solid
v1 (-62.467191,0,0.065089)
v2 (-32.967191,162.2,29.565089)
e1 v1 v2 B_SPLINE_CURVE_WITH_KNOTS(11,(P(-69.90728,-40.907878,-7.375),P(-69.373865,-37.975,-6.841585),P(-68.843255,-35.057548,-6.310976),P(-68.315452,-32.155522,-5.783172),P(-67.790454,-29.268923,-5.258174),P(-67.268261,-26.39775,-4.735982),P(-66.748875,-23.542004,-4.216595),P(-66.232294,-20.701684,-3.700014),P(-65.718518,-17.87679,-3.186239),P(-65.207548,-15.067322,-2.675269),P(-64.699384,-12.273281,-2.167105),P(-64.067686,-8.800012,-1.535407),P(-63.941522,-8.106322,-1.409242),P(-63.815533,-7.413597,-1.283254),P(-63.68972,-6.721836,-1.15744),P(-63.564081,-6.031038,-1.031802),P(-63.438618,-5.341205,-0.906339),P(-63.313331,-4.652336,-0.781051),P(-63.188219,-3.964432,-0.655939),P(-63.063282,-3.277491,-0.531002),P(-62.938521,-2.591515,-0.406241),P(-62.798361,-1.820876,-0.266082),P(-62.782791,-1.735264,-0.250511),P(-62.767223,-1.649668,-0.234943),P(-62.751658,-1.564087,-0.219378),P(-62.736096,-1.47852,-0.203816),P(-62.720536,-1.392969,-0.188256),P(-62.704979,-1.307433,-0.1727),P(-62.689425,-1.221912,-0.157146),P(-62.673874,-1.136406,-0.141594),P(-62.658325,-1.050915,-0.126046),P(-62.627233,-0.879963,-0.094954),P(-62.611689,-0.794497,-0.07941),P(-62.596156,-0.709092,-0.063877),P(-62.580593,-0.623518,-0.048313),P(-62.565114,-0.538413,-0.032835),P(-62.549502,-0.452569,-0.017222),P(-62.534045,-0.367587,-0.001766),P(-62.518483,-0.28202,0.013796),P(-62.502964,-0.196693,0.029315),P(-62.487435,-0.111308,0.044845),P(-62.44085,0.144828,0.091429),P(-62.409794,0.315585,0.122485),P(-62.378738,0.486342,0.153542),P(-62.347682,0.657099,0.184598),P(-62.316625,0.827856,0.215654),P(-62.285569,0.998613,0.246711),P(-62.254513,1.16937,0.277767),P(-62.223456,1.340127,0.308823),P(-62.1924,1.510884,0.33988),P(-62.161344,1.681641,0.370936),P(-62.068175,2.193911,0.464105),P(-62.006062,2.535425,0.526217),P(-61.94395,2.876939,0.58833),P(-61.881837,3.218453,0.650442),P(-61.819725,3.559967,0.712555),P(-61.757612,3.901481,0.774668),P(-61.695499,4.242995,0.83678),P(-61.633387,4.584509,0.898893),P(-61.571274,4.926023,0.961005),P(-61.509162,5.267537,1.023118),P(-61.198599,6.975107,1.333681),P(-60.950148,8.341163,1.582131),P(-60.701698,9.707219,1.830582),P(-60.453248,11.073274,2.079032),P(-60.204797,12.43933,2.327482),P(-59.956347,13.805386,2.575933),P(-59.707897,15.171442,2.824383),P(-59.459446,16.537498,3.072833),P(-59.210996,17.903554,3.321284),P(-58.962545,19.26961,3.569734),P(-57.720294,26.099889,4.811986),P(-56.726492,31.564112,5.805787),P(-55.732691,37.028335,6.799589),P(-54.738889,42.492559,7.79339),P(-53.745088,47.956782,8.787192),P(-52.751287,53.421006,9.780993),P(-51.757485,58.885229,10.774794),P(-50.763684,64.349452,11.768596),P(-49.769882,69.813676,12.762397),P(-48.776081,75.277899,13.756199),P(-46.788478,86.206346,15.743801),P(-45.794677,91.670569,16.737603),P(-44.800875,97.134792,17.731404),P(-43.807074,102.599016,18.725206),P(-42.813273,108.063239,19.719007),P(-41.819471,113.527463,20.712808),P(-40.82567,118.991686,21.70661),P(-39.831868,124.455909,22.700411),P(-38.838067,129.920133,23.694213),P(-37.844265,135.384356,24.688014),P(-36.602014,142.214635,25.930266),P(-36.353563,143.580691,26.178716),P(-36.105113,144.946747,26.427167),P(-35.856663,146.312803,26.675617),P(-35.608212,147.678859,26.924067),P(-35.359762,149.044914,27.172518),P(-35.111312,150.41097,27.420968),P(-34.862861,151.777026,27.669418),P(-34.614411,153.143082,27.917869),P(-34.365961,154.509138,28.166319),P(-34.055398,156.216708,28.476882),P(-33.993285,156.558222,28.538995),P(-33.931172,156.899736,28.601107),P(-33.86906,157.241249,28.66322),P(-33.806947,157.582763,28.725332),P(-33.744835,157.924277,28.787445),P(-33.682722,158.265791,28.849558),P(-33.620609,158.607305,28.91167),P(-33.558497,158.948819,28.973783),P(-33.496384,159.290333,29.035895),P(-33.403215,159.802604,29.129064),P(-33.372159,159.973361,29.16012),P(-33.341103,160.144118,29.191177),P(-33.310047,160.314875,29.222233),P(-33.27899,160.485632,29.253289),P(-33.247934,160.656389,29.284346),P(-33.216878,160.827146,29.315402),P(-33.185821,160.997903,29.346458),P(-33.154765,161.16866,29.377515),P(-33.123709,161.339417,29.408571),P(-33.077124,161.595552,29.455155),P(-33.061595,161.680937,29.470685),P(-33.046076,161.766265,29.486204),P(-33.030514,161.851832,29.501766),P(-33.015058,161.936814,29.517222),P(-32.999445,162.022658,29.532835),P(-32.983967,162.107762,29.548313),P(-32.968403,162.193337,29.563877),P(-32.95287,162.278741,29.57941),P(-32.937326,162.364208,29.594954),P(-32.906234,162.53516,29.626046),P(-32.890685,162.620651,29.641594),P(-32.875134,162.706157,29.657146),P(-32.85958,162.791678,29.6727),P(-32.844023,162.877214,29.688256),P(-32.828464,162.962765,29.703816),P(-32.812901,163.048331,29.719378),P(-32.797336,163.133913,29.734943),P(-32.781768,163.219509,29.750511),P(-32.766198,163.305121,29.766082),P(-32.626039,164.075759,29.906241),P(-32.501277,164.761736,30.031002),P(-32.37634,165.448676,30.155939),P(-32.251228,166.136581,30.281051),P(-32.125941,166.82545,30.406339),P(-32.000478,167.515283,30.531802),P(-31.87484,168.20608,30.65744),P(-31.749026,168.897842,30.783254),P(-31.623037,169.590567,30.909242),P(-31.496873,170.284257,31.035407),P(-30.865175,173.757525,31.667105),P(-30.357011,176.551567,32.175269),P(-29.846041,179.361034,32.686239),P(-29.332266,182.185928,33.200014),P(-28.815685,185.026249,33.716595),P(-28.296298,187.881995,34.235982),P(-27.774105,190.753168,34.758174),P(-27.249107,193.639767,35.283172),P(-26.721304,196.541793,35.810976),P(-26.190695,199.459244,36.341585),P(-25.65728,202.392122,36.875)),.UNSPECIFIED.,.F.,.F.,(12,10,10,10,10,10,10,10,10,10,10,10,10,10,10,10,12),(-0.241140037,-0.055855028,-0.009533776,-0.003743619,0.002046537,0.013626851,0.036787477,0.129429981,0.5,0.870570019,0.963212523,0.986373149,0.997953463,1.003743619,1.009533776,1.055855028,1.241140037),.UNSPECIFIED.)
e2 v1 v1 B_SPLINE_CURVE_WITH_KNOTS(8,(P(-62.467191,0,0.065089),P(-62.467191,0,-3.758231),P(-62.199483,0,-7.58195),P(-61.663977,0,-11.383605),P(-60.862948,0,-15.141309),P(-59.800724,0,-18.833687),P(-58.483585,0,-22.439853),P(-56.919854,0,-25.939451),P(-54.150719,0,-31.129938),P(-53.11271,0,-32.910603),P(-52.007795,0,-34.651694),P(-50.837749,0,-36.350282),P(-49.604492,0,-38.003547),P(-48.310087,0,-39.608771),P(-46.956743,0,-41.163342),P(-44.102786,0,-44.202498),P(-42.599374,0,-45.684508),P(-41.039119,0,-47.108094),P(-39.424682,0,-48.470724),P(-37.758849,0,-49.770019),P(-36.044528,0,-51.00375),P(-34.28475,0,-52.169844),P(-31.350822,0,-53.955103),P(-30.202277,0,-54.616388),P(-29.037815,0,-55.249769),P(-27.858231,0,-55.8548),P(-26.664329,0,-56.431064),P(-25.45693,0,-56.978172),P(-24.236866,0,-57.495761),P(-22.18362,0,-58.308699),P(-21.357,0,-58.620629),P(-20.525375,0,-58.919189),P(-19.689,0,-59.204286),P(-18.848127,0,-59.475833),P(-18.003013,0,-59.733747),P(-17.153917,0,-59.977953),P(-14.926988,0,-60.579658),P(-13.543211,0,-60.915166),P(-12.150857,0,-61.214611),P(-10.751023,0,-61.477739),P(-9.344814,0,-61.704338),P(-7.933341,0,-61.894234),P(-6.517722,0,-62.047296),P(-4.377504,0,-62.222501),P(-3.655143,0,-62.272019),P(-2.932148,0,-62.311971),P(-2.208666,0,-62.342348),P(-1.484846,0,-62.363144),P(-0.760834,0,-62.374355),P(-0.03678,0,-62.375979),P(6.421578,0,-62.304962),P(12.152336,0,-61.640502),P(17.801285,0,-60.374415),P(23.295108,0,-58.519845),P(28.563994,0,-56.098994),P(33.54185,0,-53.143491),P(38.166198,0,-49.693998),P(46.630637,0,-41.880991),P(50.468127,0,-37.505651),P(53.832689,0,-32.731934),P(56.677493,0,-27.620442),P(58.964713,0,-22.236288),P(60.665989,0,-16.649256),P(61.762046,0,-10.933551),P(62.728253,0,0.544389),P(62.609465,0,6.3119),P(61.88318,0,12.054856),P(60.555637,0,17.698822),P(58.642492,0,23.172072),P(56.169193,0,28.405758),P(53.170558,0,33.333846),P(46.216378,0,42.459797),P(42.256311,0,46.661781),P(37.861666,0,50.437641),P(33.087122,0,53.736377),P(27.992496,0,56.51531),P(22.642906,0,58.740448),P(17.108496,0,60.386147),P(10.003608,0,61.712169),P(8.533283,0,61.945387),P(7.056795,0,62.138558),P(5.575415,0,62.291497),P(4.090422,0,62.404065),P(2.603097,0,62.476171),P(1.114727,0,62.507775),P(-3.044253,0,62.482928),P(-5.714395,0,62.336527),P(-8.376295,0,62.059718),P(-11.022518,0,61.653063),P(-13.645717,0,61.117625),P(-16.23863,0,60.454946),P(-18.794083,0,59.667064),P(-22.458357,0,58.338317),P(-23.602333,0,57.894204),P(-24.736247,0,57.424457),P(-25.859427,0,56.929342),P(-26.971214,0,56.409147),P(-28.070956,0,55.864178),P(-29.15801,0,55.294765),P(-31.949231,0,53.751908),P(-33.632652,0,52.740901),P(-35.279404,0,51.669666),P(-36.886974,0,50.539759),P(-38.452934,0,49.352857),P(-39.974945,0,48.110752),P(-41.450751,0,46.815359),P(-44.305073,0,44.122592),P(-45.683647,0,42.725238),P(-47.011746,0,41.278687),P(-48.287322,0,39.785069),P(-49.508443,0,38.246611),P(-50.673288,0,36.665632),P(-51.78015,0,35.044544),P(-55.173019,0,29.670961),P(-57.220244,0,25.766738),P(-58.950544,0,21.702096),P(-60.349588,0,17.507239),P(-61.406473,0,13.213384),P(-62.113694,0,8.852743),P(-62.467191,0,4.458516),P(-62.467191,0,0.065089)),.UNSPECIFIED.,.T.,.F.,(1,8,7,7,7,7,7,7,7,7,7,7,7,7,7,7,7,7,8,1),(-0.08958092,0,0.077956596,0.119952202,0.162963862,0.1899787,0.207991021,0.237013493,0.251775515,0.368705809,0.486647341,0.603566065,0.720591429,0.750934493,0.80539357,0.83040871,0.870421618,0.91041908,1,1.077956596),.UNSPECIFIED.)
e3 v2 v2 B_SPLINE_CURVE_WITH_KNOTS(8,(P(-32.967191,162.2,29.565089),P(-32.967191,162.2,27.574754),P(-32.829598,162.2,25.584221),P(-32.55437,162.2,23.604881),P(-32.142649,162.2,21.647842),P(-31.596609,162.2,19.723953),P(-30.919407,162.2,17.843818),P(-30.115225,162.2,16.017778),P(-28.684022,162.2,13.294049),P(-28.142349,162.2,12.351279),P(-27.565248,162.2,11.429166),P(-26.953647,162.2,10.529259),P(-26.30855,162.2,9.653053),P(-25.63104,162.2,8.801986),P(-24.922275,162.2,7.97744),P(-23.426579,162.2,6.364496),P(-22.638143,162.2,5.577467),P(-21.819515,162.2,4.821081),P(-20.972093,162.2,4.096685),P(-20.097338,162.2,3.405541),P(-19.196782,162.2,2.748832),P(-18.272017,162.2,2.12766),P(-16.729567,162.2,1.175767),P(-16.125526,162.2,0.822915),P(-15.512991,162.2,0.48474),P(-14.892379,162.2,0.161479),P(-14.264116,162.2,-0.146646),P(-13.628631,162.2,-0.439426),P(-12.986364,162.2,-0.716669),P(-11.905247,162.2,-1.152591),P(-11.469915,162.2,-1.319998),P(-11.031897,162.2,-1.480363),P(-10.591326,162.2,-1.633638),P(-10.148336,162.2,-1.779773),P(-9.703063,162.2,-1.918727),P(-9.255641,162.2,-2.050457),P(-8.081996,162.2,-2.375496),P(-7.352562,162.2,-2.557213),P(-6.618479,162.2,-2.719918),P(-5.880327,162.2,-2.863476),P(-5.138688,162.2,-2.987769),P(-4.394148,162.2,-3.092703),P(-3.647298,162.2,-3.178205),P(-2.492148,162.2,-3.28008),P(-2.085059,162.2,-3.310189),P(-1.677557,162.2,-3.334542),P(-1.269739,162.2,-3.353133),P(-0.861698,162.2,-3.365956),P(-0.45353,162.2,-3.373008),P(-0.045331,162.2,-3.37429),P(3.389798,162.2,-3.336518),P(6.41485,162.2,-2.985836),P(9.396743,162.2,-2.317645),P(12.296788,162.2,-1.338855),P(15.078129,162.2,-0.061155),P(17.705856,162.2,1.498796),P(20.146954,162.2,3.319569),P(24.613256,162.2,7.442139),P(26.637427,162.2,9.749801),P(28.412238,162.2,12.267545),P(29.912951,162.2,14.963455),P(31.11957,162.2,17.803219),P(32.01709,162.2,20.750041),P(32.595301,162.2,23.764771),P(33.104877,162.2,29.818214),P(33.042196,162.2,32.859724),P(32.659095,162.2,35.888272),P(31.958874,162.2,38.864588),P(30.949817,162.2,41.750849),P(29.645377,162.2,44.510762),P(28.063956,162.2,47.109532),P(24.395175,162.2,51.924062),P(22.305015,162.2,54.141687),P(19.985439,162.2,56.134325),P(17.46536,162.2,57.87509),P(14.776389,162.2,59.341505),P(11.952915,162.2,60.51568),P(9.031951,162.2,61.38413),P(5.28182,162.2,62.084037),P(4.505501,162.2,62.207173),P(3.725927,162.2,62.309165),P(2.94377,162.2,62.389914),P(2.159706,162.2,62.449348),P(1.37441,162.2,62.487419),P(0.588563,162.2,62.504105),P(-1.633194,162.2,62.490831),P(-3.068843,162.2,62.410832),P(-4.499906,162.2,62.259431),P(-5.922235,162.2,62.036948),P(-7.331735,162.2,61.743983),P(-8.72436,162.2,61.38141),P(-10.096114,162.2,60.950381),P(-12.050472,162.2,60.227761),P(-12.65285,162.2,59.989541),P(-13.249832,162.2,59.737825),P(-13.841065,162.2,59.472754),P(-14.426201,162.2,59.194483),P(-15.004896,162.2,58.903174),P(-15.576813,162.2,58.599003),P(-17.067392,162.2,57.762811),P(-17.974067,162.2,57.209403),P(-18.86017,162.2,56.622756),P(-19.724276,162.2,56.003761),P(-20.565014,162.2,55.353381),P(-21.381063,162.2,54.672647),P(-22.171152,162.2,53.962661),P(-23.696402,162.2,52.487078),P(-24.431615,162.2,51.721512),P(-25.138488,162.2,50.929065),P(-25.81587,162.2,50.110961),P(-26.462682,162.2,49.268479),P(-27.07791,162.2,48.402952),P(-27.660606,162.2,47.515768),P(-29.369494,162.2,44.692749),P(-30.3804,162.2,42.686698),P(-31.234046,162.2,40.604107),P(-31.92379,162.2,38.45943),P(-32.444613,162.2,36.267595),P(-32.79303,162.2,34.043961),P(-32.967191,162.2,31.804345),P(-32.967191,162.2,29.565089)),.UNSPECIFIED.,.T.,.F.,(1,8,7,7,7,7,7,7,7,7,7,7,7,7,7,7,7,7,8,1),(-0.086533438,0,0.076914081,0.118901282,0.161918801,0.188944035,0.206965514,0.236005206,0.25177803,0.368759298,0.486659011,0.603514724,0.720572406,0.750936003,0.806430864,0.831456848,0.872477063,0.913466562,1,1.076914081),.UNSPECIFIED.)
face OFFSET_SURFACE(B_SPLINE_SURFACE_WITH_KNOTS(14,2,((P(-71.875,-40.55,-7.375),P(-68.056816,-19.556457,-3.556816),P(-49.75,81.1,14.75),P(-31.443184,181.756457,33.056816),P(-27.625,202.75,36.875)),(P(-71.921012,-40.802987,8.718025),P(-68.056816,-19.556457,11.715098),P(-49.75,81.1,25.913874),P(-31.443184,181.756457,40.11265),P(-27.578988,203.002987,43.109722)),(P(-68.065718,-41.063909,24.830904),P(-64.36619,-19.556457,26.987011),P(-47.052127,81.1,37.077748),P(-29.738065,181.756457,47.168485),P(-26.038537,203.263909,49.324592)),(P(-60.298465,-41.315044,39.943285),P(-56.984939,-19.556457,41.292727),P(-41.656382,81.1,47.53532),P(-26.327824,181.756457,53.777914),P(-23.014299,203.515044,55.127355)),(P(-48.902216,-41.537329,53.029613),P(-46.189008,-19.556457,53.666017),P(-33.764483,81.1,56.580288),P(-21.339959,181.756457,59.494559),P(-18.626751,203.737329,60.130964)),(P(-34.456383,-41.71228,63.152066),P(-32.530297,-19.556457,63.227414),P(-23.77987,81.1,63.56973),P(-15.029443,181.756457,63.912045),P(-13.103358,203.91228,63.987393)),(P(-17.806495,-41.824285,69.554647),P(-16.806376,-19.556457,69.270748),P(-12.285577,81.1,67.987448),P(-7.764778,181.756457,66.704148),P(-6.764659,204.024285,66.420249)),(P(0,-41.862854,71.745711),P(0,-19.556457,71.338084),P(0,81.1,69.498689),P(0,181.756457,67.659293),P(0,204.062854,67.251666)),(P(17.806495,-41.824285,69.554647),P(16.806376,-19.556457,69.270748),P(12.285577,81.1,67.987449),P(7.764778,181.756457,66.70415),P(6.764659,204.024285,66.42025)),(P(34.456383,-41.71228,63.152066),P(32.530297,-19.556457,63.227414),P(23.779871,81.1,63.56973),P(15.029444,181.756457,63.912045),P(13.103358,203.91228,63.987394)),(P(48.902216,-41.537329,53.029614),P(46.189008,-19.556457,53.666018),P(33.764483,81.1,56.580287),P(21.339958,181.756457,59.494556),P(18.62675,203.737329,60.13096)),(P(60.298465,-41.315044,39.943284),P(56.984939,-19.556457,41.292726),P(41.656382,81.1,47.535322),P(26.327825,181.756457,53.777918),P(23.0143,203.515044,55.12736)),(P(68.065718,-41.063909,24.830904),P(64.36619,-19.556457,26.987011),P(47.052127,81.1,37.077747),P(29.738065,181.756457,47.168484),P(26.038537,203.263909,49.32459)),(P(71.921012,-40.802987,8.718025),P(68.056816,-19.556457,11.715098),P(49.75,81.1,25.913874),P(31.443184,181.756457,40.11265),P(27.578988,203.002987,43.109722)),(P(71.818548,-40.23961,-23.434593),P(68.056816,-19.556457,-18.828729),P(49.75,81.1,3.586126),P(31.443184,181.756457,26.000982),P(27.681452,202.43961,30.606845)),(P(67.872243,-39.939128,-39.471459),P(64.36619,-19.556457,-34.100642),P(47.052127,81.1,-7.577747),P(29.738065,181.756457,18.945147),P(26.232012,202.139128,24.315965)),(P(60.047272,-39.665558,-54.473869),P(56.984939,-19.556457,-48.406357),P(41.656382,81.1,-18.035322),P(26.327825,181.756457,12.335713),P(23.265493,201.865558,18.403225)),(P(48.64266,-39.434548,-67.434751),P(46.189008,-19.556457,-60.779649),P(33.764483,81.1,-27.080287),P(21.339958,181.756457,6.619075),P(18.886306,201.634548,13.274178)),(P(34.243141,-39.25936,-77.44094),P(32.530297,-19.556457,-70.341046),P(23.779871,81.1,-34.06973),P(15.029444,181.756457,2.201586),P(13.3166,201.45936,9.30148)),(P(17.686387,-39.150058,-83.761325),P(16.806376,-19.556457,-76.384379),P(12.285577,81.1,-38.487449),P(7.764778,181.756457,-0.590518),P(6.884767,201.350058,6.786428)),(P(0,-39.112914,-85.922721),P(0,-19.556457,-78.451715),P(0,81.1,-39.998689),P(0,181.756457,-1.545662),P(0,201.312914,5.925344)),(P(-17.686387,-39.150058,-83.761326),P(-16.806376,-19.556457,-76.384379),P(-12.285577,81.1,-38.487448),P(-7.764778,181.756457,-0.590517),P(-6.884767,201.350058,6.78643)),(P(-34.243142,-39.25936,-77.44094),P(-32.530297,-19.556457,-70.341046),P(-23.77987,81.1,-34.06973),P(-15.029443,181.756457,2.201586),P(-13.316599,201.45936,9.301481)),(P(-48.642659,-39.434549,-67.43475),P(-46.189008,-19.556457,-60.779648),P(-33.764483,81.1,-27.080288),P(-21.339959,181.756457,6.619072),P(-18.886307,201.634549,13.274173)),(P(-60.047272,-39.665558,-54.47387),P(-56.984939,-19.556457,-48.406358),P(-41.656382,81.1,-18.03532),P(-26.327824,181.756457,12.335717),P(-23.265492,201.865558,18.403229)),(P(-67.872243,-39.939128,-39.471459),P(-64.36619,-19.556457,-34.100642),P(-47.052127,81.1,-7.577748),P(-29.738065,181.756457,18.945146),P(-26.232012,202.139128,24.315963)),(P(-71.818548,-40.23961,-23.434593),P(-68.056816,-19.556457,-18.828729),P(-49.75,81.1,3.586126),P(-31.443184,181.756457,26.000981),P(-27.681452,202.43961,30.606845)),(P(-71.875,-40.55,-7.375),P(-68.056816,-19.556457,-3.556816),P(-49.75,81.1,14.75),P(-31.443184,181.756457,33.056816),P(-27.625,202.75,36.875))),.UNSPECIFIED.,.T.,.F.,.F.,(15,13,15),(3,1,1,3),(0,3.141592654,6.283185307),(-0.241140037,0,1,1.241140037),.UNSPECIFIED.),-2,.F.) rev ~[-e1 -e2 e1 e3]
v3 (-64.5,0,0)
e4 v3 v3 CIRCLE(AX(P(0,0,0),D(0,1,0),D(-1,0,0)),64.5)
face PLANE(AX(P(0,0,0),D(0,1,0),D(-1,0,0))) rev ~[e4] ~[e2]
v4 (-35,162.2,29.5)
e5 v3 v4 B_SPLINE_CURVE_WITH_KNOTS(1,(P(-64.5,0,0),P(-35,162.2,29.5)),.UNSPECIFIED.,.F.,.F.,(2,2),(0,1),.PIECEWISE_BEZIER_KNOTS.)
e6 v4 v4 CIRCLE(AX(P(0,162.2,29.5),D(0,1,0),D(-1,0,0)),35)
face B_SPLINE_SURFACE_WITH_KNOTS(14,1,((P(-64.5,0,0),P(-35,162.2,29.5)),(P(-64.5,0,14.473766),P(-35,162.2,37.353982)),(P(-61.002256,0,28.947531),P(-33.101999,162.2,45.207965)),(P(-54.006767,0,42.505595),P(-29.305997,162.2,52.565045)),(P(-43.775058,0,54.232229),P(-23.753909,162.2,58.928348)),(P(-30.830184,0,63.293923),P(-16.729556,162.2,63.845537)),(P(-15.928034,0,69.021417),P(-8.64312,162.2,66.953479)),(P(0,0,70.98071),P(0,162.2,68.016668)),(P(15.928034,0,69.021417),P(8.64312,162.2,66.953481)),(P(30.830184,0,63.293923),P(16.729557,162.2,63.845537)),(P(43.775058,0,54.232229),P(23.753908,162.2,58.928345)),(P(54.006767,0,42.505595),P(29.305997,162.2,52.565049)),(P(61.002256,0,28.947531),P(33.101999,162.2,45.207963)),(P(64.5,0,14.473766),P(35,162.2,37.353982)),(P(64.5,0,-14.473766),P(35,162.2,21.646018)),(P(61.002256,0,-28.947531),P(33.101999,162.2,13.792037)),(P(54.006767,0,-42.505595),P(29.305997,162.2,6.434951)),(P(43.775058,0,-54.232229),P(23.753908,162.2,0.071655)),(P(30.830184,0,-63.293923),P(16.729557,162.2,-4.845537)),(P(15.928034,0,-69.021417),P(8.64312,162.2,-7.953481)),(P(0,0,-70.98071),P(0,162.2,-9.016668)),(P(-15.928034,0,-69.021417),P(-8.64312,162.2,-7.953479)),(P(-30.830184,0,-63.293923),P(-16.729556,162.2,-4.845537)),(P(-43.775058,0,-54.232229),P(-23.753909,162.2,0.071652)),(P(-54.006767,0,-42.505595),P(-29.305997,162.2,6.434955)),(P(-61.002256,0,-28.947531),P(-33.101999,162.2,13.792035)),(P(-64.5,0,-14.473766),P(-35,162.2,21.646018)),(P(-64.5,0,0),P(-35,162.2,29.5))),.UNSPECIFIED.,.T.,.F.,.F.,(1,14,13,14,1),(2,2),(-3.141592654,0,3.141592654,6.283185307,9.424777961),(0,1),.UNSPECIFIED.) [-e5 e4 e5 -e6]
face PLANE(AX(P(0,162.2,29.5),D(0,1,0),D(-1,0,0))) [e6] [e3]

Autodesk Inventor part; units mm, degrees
ref_plane "YZ Plane" through (0, 0, 0) normal (1, 0, 0) x (0, 1, 0)
ref_plane "XY Plane" through (0, 0, 0) normal (0, 0, 1) x (1, 0, 0)
sketch "Szkic6" plane through (0, 0, 0) normal (0, 1, 0) x (-1, 0, 0)
  circle A0 centre (0, 0) radius 64.5
  dimension "d33" = 129
ref_plane "Płaszczyzna konstrukcyjna1" through (0, 162.2, 0) normal (0, 1, 0) x (-1, 0, 0)
sketch "Szkic7" plane through (0, 162.2, 0) normal (0, 1, 0) x (-1, 0, 0)
  circle A0 centre (0, 29.5) radius 35
  line L0 (0, -20.3) -> (0, 20.3) construction
  circle A1 centre (0, 0) radius 64.5 construction
  dimension "d35" = 70
loft "Wyciągnięcie złożone1" add profiles "Szkic6", "Szkic7"
shell "Skorupa1" thickness 2 removed faces 2 at (-13.0142, 162.2, 29.3425) at (-10.0865, 0, -16.1433)
equation "\"d33\" = OD1"
equation "\"d35\" = OD2"
equation "\"d52\" = THK"
equation "\"SzerokośćGięciaPodcięcia\" = Grubość"
equation "\"RozmiarPodcięciaNarożnika\" = 4 * Grubość"
equation "\"PromieńPrzejścia\" = PromieńGięcia"
equation "\"Rozmiar_promienia_Jacobiego\" = PromieńGięcia"
equation "\"Wielk_odstępu\" = Grubość"
equation "\"d2\" = PromieńGięcia"
equation "\"d23\" = PromieńGięcia"
equation "\"OD1\" = 129"
equation "\"OD2\" = 70"
equation "\"L\" = 162.2"
equation "\"THK\" = 2"
equation "\"d34\" = L"
equation "\"Grubość\" = 1.5"
equation "\"PromieńGięcia\" = 3"
properties part number "Redukcja asymetryczna Ø129x70x2 L=162,2" material "304"
